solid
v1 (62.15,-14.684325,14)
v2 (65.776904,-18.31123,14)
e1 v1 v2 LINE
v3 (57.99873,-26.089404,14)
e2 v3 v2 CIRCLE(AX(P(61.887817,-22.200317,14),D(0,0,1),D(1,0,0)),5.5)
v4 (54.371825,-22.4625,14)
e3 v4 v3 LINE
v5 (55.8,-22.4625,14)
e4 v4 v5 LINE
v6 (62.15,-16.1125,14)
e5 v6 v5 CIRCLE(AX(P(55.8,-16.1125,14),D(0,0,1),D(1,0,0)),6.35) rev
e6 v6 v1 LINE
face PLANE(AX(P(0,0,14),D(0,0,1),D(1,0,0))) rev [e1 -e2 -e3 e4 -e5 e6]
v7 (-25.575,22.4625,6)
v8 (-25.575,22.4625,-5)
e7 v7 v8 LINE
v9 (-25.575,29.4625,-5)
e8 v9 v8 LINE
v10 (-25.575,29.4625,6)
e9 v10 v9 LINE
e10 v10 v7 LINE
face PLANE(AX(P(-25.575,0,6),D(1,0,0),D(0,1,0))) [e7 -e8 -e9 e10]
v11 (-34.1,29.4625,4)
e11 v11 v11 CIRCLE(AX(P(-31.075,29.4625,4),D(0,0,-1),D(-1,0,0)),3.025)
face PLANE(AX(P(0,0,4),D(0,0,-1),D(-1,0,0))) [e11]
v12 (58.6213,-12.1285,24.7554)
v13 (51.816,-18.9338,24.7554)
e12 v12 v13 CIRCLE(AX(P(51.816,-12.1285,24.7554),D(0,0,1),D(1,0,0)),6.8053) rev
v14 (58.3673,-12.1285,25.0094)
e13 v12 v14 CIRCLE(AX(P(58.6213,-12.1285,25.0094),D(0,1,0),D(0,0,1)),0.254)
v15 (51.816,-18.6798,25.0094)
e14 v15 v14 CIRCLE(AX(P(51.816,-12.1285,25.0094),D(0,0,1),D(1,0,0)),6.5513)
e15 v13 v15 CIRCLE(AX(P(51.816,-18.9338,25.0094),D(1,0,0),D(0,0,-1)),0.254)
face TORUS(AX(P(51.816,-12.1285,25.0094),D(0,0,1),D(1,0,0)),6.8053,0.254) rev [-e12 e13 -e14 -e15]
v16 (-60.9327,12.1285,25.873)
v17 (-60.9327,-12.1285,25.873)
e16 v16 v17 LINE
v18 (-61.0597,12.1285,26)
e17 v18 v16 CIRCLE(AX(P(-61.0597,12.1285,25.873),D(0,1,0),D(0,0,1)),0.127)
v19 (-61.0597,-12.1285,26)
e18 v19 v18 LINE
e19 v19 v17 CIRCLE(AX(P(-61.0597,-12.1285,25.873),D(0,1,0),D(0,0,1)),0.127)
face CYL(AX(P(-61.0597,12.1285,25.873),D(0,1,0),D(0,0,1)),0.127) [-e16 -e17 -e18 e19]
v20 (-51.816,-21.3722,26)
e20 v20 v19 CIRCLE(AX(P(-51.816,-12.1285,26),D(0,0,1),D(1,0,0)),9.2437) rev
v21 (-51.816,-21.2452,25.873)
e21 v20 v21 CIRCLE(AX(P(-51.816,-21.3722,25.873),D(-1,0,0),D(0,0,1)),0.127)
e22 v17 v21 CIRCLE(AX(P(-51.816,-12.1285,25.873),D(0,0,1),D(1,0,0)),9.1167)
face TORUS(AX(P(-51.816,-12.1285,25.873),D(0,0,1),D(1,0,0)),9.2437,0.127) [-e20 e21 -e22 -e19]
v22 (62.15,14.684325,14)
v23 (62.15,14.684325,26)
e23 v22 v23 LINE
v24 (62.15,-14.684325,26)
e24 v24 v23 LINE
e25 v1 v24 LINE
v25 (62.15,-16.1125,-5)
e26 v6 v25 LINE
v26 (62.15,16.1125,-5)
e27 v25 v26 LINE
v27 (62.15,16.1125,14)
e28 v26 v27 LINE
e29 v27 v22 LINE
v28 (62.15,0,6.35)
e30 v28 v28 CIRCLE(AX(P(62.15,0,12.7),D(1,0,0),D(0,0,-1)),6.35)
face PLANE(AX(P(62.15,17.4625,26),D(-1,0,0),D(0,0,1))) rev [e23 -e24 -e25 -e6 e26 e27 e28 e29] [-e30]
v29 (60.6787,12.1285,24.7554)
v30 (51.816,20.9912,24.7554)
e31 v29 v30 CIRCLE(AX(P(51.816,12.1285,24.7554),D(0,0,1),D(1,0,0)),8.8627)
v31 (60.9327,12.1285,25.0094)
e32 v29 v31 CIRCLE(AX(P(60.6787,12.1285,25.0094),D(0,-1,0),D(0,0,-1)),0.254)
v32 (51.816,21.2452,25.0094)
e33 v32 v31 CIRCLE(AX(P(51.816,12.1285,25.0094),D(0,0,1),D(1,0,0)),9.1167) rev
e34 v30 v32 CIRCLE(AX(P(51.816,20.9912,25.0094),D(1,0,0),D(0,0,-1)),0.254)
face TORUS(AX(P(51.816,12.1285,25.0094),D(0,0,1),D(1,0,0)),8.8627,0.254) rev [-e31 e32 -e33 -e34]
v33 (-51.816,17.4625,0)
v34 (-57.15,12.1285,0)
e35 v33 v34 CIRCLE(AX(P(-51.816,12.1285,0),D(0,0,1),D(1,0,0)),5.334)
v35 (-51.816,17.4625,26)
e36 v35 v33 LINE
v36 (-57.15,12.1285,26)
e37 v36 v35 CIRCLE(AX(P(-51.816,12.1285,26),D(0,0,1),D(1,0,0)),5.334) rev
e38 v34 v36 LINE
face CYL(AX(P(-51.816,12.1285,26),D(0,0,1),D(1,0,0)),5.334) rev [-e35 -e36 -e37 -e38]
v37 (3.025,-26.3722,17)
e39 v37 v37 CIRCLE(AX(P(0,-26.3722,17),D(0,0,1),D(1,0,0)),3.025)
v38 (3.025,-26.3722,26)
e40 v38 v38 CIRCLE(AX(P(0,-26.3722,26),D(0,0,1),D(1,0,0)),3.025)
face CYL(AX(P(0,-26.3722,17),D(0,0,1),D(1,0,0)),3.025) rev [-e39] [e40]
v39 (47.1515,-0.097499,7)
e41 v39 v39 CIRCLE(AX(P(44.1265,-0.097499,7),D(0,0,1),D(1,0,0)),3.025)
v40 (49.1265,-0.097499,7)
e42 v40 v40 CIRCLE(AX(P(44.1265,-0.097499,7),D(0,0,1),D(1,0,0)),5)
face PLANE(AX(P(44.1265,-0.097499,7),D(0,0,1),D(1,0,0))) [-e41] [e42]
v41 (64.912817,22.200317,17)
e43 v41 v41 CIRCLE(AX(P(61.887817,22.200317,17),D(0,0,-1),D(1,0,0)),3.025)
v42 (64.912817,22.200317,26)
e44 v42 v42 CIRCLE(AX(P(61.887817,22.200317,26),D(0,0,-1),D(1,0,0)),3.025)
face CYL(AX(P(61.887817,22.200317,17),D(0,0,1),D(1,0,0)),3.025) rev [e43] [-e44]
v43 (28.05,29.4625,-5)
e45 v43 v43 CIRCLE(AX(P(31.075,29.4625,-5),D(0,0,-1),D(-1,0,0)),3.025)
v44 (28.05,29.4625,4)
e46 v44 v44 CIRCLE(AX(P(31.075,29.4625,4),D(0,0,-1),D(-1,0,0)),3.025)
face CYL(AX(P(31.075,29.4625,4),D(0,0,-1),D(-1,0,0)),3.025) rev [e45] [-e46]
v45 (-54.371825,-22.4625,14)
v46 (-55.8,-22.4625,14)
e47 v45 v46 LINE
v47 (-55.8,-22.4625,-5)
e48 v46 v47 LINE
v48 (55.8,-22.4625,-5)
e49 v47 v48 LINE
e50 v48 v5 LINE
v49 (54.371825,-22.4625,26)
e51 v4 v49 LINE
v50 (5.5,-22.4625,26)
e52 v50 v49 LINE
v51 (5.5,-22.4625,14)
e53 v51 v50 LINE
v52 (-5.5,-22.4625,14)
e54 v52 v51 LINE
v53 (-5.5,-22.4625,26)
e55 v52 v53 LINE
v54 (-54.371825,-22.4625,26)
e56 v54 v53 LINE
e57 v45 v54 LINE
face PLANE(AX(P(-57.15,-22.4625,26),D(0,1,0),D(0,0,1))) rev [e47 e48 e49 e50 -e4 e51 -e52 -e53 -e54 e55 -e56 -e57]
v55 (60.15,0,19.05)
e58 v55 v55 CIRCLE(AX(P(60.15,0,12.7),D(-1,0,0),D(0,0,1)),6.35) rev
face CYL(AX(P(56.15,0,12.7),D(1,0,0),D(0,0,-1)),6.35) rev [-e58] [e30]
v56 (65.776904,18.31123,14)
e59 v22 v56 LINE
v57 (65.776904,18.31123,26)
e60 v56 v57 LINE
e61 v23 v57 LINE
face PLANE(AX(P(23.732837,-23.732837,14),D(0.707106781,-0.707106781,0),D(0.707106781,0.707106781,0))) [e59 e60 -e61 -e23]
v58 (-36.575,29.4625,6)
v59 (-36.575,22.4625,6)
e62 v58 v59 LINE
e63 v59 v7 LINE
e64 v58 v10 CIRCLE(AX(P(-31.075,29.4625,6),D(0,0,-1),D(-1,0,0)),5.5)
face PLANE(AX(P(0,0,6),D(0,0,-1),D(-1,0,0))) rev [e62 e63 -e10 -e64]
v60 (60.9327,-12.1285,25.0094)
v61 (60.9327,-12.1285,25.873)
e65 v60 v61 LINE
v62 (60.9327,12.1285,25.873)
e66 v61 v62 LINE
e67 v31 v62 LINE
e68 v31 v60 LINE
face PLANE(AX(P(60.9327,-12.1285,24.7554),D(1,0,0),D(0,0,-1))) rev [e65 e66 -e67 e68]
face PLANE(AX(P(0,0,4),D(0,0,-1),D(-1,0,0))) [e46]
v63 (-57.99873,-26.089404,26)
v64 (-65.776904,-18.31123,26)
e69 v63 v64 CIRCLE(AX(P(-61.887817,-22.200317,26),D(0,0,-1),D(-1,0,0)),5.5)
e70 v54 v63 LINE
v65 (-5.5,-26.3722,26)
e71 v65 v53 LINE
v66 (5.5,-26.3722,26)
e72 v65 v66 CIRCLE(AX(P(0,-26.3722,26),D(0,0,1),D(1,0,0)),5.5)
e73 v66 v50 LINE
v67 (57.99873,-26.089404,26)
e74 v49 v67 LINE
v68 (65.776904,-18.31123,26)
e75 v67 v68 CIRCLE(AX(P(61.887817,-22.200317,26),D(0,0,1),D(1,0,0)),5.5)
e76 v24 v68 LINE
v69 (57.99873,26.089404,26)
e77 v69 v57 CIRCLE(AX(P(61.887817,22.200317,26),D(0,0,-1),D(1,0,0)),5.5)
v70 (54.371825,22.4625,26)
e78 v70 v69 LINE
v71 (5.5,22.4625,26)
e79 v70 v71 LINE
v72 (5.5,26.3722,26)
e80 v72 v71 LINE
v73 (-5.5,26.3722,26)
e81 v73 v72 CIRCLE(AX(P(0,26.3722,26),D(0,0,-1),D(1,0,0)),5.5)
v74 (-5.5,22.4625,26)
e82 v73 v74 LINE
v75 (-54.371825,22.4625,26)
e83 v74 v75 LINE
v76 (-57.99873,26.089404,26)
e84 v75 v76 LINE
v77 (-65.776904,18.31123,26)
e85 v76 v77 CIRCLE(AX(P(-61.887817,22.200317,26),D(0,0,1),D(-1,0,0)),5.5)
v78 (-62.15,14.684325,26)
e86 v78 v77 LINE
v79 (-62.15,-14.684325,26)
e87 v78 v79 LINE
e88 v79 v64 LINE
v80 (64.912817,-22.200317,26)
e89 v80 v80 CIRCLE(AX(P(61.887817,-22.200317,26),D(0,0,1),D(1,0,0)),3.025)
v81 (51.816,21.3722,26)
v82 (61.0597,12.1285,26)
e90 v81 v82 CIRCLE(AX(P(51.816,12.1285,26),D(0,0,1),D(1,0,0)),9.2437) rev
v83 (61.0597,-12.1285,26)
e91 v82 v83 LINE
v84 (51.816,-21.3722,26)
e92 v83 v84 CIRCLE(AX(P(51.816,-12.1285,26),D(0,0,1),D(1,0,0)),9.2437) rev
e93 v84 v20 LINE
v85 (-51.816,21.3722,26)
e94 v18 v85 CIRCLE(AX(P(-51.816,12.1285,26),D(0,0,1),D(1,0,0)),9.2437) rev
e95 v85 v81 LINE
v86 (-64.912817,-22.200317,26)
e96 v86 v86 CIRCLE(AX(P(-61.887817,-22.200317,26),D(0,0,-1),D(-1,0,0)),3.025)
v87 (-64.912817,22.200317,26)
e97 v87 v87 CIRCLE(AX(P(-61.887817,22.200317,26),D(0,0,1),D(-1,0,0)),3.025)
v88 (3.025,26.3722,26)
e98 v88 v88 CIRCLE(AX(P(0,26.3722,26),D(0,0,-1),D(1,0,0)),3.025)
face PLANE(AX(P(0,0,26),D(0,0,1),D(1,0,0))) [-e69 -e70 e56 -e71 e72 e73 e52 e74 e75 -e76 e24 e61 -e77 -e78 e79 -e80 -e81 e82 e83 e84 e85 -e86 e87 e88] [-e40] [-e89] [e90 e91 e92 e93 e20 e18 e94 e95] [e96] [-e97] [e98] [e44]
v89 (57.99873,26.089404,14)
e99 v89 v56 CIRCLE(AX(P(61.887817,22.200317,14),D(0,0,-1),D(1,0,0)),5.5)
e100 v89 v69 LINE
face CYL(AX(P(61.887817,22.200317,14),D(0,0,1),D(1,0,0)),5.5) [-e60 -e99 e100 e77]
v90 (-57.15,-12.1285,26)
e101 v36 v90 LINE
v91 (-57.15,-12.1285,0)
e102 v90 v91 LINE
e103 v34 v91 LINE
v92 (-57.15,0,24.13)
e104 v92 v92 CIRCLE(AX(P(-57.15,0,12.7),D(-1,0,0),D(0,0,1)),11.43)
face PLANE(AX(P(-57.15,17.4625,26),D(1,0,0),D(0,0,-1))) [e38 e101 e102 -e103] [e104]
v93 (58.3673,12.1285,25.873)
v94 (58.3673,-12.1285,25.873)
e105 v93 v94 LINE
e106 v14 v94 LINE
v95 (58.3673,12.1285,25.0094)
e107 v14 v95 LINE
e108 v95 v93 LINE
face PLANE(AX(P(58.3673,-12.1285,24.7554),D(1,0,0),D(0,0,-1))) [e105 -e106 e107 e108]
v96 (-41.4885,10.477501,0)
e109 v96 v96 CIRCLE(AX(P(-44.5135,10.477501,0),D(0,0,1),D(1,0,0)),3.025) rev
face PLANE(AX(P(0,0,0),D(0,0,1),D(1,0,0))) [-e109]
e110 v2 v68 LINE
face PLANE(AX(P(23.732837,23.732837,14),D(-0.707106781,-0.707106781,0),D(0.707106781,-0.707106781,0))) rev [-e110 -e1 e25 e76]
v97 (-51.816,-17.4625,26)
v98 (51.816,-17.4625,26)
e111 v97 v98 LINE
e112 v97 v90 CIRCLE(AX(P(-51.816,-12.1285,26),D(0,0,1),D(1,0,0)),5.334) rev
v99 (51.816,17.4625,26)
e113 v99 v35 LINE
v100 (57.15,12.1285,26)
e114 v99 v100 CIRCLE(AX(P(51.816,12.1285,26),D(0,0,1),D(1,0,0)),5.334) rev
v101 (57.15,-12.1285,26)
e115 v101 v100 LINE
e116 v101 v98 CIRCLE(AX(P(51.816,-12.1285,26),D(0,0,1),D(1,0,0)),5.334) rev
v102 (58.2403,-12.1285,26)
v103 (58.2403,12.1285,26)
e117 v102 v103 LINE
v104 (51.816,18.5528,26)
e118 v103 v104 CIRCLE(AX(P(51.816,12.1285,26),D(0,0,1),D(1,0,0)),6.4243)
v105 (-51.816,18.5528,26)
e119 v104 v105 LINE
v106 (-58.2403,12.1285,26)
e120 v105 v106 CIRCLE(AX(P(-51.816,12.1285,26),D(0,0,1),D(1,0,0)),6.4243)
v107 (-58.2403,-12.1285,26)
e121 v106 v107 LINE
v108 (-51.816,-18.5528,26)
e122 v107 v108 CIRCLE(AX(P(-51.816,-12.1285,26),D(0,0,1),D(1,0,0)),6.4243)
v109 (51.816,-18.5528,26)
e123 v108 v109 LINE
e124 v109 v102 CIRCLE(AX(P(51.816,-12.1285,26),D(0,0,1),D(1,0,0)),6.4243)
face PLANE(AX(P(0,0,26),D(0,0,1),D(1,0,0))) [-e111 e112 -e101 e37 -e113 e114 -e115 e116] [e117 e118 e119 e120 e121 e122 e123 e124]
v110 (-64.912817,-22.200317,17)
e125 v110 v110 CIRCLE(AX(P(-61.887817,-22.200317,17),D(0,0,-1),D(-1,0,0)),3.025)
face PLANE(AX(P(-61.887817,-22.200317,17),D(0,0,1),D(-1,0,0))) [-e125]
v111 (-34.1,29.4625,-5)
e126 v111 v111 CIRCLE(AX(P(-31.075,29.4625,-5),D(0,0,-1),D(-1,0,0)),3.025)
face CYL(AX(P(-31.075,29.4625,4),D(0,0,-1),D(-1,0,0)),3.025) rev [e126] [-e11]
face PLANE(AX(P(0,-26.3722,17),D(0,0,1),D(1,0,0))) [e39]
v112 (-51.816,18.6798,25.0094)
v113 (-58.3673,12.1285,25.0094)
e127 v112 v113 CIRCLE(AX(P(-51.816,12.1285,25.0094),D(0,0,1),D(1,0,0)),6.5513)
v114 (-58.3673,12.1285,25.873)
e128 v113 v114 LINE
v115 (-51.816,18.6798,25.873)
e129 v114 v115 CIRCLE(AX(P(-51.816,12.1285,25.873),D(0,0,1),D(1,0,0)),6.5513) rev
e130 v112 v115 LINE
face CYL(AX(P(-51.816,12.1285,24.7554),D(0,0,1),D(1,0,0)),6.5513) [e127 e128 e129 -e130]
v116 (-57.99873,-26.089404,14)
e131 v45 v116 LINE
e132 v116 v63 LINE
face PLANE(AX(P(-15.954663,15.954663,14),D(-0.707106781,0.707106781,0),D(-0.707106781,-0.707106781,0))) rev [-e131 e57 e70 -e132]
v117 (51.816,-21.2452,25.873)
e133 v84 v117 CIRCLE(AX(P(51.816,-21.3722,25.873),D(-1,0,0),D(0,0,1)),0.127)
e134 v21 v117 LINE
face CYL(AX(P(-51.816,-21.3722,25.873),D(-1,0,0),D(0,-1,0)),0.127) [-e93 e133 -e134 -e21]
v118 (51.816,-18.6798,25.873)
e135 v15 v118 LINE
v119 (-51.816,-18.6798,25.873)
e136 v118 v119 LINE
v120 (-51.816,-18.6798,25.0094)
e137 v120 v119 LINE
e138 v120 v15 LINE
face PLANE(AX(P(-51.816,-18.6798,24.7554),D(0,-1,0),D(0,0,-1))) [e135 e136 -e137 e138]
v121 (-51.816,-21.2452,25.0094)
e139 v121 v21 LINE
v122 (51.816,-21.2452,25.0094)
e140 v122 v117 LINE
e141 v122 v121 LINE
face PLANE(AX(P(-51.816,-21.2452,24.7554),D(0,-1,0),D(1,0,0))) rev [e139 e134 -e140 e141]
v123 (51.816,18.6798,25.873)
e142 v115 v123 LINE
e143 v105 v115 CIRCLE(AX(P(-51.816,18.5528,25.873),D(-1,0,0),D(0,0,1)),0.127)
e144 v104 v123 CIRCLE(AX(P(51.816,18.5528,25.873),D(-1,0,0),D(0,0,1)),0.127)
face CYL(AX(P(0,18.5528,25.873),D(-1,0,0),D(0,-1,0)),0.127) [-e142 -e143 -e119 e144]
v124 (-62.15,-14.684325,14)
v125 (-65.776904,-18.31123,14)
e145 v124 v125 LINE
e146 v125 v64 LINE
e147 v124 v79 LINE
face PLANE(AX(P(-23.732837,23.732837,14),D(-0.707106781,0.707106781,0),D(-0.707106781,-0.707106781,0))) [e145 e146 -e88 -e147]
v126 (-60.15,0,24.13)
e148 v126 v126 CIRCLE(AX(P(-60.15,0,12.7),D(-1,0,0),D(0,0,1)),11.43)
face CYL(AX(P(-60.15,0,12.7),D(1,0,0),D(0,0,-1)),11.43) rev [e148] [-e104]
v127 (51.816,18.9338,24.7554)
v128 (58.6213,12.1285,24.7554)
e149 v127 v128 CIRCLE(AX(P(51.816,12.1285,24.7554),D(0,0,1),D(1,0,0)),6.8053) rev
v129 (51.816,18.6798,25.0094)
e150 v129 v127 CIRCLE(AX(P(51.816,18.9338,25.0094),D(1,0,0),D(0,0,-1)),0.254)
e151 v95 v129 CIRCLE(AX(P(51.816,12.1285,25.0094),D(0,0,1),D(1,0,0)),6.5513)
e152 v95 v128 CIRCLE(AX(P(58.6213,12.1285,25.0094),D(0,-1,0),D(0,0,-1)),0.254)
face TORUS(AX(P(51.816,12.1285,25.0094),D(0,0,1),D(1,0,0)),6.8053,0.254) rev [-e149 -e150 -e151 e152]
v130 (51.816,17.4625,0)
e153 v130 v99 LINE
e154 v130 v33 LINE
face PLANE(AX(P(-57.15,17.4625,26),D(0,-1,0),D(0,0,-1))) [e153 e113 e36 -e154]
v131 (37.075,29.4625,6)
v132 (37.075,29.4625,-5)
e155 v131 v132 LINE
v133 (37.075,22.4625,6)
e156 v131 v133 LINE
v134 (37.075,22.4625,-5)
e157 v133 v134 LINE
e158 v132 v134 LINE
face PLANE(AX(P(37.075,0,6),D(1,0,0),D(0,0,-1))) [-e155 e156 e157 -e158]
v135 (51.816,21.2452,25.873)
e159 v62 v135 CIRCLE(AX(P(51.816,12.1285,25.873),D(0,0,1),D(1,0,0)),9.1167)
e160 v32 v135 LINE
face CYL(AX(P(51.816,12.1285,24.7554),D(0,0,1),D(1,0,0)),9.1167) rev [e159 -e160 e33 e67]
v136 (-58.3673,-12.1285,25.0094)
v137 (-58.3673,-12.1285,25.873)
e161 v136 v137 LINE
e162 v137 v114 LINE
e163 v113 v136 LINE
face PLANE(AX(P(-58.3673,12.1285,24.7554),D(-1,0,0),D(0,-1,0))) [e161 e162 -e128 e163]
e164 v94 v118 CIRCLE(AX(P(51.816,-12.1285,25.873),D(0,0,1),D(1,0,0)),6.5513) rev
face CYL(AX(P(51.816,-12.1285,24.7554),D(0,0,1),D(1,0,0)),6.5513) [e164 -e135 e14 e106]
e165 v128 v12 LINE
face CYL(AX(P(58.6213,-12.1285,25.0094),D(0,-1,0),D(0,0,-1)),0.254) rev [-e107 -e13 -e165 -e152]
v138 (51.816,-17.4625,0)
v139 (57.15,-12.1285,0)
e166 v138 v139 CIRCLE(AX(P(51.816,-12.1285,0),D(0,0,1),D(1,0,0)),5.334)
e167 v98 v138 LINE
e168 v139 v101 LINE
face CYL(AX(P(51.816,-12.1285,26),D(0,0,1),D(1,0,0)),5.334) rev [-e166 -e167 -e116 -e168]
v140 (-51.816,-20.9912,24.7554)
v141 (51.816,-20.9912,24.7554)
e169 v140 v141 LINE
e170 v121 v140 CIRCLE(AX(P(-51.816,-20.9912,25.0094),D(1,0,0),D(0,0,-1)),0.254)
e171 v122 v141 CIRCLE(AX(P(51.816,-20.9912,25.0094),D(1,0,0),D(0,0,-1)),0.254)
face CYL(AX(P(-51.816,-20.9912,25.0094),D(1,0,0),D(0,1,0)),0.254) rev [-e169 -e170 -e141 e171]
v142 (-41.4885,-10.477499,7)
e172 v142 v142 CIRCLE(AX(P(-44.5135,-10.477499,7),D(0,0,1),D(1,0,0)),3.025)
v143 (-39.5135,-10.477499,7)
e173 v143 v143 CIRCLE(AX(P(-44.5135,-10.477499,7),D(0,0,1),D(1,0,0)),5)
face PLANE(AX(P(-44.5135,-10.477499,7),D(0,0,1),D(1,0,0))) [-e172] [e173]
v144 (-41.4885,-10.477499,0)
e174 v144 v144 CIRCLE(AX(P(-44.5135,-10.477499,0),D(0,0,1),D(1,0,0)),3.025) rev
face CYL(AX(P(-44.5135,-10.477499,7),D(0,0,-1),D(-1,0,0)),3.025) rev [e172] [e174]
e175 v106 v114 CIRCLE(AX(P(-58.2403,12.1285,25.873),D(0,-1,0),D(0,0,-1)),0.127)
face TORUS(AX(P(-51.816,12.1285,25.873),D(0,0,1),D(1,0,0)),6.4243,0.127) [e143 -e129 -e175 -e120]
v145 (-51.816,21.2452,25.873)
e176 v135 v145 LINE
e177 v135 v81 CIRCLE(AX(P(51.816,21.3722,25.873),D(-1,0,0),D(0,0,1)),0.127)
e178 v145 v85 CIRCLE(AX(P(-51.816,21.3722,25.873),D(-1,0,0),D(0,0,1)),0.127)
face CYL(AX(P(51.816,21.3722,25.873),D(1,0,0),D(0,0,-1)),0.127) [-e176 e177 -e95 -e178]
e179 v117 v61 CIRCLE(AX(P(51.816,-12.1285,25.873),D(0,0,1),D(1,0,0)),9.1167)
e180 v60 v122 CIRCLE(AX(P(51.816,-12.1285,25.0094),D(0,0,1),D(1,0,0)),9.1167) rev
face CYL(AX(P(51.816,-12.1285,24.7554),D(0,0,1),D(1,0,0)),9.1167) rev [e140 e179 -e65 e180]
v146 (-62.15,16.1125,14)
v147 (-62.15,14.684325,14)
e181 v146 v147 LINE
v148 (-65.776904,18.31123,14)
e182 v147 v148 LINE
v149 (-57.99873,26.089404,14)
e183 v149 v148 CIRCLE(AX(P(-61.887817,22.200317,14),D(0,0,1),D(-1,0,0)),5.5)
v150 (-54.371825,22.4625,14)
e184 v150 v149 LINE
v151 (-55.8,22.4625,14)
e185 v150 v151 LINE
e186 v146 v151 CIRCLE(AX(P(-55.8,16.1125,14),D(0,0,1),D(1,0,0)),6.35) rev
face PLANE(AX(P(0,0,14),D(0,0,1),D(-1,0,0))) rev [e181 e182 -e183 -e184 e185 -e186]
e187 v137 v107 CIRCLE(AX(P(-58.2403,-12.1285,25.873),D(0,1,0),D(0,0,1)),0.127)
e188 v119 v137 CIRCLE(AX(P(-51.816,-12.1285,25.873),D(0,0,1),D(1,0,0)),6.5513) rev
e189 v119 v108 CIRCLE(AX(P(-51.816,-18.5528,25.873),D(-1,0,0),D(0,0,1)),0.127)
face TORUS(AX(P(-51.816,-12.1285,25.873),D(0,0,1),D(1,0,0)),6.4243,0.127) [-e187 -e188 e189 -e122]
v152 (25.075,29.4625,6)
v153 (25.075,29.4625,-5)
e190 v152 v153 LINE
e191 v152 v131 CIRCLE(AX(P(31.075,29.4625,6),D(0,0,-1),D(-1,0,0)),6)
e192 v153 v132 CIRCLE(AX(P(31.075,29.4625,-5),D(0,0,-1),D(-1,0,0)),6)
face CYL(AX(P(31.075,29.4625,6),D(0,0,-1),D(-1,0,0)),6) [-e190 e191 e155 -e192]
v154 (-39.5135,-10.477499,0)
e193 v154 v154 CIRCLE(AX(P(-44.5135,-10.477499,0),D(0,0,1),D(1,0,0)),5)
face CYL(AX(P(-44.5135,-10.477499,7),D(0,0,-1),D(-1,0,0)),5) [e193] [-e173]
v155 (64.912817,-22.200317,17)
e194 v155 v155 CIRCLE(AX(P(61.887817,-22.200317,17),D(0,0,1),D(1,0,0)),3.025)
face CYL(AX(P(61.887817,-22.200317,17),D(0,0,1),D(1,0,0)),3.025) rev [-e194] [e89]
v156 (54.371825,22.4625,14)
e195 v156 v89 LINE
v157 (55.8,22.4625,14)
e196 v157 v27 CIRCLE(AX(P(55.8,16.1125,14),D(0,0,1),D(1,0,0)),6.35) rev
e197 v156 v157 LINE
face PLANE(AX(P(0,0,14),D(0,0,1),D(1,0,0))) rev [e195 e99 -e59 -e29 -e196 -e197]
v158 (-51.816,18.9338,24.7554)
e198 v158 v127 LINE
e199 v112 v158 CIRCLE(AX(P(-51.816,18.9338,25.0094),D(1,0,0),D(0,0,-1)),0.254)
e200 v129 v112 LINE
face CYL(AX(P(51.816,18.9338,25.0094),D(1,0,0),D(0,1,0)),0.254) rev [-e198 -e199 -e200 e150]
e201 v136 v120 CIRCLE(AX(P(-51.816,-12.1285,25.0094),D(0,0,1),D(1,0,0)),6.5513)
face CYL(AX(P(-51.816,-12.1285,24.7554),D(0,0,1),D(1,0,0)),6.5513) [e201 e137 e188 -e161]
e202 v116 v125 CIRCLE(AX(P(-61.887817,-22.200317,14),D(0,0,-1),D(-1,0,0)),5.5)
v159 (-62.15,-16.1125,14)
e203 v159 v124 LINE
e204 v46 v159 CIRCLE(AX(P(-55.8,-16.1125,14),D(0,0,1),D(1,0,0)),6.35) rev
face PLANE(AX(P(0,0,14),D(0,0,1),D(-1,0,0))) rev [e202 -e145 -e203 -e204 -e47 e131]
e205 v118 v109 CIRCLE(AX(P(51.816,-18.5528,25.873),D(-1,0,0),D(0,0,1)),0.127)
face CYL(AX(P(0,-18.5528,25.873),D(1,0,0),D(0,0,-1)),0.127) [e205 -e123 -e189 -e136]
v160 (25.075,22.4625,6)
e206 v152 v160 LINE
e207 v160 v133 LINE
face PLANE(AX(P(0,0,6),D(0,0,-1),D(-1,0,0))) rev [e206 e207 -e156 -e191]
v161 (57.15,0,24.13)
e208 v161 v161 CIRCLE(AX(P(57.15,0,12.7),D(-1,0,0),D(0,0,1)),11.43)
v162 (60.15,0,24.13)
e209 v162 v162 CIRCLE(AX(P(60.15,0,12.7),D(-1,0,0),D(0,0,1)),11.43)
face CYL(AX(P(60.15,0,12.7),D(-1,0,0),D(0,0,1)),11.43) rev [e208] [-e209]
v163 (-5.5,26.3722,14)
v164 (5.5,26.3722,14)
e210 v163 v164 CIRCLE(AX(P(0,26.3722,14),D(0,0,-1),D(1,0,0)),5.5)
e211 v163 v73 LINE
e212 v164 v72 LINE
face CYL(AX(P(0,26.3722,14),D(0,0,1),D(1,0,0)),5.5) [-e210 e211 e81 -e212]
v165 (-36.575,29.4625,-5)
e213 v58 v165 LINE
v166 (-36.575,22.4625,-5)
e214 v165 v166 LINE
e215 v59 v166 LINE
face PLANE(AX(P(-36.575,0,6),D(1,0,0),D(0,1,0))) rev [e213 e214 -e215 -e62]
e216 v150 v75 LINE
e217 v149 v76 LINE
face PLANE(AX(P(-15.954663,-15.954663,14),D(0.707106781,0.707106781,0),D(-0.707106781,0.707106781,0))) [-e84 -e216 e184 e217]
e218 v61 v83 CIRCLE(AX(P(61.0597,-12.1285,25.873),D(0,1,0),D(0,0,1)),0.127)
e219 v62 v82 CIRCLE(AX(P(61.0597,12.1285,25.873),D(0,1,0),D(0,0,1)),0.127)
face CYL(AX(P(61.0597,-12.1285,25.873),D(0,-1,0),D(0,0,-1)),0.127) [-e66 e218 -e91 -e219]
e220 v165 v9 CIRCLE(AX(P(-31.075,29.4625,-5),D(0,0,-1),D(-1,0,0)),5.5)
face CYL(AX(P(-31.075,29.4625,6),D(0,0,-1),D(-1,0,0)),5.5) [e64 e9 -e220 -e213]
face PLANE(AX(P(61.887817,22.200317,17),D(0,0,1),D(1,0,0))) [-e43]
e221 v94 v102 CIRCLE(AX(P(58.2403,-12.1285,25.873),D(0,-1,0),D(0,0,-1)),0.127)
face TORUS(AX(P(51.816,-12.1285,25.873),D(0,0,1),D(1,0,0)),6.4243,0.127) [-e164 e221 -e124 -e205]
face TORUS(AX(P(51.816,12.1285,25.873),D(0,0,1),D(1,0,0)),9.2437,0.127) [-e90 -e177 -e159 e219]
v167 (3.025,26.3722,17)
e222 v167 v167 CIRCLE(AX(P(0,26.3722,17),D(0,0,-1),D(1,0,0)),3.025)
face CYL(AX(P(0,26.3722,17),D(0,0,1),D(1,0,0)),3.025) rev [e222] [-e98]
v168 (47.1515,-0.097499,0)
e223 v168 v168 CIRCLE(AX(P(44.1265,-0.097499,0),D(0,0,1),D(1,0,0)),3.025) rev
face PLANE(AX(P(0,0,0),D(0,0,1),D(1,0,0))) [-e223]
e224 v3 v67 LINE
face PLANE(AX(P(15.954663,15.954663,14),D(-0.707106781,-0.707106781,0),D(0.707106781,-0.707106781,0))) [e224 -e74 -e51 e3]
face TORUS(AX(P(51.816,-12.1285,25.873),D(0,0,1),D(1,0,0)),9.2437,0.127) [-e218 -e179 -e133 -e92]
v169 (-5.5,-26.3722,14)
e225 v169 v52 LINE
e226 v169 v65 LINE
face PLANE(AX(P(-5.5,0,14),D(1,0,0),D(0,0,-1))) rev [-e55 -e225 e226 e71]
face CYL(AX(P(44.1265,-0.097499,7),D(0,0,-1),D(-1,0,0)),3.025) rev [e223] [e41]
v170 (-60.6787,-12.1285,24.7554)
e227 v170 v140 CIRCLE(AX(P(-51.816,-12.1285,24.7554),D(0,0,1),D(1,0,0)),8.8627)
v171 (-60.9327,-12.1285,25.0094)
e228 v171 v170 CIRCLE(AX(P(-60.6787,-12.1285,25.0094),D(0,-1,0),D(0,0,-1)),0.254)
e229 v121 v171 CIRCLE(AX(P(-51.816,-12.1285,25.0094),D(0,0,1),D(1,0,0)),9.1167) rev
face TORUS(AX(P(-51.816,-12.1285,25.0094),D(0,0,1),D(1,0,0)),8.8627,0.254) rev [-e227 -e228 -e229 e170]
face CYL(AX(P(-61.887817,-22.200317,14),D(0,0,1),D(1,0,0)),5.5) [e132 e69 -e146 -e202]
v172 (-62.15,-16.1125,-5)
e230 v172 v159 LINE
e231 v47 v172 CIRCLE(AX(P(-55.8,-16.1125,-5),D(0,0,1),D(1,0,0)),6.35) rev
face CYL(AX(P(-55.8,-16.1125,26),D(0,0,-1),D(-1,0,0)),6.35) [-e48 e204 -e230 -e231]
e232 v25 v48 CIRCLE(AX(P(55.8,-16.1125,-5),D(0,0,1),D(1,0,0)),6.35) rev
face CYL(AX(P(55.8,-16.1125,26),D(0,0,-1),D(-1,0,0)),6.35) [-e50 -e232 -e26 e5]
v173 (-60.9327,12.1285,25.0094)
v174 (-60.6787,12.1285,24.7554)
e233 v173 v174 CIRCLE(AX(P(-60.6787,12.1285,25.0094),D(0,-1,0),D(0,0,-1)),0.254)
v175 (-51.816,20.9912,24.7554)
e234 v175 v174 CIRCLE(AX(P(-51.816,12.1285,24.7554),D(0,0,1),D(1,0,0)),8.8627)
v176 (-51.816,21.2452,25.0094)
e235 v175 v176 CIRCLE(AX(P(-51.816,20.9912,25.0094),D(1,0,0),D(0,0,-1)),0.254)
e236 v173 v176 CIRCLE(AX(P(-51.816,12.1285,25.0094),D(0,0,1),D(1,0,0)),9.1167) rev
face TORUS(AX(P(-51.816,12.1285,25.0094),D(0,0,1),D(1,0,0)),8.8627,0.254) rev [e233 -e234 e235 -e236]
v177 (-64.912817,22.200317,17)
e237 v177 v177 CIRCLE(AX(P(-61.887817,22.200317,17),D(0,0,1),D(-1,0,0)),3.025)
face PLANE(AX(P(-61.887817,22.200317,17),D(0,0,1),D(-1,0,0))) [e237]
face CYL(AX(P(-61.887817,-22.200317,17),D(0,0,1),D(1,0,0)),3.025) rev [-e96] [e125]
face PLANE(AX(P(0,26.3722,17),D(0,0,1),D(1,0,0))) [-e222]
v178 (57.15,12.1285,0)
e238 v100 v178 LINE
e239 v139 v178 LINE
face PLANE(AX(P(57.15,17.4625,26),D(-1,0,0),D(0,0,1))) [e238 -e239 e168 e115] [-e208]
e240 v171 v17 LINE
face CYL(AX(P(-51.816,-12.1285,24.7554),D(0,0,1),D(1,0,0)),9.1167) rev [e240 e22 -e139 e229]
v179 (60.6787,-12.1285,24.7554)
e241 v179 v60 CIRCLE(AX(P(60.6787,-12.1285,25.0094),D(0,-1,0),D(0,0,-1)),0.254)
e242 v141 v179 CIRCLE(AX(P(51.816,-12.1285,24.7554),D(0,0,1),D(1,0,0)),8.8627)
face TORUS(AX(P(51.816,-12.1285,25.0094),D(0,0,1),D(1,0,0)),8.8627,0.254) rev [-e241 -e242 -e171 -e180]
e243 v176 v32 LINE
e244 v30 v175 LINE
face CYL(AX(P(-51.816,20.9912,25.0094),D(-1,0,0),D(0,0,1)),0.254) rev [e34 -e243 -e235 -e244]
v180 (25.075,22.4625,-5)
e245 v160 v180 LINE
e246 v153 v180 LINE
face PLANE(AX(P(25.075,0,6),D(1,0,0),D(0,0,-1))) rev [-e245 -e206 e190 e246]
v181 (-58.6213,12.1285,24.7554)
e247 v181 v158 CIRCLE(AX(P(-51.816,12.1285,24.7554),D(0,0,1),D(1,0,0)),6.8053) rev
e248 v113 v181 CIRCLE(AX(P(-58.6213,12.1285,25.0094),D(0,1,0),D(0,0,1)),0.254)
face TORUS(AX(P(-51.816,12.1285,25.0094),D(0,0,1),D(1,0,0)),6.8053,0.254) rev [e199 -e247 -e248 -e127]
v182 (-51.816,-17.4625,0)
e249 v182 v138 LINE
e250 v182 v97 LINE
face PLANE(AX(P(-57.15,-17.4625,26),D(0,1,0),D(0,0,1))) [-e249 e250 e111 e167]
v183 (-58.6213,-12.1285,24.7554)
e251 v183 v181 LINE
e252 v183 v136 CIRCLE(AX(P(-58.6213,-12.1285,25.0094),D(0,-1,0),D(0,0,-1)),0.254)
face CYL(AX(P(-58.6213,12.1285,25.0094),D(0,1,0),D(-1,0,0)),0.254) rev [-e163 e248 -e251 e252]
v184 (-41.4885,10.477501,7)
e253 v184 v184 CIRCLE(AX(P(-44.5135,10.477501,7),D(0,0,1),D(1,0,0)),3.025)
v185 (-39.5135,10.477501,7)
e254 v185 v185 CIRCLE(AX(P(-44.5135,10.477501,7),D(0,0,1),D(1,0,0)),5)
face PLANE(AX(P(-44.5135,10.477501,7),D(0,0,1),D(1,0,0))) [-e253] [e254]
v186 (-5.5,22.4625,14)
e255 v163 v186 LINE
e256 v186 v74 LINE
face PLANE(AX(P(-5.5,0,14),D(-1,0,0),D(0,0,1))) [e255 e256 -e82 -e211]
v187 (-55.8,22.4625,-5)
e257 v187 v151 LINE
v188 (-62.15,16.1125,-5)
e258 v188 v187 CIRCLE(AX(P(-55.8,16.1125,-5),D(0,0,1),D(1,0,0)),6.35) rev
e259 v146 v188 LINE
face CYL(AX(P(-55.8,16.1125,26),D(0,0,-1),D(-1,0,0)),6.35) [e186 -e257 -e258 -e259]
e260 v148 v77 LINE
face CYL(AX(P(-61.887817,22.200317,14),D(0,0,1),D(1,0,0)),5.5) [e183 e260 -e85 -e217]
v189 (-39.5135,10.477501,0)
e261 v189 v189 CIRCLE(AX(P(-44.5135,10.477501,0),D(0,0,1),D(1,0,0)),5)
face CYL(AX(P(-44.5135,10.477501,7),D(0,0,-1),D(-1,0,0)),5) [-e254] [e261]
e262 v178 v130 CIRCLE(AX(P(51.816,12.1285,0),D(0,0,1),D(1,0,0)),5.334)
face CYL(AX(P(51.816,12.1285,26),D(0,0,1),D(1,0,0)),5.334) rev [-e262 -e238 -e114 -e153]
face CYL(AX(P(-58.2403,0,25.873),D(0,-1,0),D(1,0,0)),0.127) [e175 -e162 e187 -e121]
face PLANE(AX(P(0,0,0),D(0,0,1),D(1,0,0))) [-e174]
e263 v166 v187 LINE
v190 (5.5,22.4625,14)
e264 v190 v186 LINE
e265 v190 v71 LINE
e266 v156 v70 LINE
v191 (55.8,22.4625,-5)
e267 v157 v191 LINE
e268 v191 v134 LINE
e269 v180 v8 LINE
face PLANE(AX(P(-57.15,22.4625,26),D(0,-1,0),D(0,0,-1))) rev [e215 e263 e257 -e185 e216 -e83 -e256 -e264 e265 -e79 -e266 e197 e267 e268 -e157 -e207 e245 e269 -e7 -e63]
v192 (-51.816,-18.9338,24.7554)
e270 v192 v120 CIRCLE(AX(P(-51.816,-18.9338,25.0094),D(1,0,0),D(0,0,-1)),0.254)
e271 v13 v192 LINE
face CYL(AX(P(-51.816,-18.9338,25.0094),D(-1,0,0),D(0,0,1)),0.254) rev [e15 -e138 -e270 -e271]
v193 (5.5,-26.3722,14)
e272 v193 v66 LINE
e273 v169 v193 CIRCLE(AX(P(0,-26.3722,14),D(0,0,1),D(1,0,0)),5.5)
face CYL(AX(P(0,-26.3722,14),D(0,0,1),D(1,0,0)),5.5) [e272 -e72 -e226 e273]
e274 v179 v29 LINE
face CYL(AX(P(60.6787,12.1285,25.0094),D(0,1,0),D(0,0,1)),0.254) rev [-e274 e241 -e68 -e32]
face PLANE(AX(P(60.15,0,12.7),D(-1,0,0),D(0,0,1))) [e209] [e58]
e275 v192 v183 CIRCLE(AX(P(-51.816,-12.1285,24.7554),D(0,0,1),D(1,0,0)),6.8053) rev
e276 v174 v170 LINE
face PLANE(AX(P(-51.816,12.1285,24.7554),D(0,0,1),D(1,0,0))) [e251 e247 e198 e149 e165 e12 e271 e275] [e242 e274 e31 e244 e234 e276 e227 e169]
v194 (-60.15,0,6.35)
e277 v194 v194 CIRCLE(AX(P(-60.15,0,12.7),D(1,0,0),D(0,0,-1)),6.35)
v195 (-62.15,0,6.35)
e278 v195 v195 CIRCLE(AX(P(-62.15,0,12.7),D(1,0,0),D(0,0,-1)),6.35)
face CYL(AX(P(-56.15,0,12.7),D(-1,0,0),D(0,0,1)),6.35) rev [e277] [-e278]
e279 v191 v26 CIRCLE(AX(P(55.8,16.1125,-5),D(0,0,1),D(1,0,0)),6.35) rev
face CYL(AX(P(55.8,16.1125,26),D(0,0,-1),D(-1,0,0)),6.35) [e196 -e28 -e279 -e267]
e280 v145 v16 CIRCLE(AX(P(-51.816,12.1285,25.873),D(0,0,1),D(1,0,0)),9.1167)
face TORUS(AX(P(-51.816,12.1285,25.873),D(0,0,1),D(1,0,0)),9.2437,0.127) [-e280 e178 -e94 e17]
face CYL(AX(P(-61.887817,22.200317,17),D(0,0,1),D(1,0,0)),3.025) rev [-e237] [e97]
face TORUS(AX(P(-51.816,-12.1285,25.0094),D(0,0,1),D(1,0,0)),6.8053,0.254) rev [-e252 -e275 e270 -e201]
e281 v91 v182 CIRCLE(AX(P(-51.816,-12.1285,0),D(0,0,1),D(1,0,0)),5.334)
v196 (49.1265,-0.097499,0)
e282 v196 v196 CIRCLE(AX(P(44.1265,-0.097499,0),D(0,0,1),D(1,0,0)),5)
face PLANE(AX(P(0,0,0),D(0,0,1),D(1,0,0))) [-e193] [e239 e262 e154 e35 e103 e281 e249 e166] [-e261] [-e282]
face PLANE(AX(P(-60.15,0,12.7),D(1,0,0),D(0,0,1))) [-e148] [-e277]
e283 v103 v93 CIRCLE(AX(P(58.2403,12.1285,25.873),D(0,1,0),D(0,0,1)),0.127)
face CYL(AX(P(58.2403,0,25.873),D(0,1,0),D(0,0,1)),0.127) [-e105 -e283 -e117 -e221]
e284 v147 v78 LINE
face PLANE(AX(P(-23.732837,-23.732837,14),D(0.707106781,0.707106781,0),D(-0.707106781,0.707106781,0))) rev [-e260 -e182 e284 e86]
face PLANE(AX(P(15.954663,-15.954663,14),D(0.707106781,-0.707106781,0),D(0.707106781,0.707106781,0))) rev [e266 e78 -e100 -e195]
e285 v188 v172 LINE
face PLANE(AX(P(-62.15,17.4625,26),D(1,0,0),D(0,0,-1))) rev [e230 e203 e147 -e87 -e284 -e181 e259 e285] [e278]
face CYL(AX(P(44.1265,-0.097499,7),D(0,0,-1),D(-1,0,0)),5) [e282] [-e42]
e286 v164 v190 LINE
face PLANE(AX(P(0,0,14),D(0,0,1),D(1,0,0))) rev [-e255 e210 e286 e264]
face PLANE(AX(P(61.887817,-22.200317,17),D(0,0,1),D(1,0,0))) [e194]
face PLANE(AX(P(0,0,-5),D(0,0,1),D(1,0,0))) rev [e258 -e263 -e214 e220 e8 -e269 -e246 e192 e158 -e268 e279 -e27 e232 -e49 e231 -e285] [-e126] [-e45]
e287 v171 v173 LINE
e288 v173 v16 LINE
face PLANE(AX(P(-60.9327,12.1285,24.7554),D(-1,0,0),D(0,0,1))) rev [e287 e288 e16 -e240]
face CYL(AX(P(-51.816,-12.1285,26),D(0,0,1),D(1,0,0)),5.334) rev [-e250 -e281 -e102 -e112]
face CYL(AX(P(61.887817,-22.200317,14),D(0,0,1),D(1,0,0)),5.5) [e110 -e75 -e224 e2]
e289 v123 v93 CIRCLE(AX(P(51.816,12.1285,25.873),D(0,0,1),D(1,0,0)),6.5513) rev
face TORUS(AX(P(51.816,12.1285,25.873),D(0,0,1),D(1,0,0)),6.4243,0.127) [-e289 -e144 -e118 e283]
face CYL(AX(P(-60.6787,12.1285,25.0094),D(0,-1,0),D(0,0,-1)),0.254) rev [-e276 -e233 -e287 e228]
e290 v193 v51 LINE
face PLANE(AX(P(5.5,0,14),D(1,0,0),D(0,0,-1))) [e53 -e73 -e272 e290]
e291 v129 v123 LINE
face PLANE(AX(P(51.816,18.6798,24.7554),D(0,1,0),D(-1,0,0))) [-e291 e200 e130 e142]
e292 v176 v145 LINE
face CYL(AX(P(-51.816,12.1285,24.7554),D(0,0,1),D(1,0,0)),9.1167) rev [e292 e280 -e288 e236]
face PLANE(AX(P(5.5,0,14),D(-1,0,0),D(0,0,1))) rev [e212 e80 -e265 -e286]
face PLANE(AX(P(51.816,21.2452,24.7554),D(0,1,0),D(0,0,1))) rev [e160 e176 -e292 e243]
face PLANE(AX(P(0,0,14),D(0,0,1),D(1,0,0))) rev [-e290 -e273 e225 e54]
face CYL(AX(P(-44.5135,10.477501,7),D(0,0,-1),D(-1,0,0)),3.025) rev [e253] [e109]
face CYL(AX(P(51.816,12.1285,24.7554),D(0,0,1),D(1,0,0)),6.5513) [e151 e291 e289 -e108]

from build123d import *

# Parameters (mm, degrees)
SKETCH1_W               = 114.3
SKETCH1_H               = 34.925
BOSS_EXTRUDE1_DEPTH     = 26
SHELL1_T                = 5
FILLET1_R               = 5.334
FILLET2_R               = 6.35
CUT_EXTRUDE1_DEPTH      = 1.2446
FILLET3_R               = 0.254
FILLET4_R               = 0.127
BOSS_EXTRUDE3_START     = -12
BOSS_EXTRUDE3_DEPTH     = 12
SKETCH5_R               = 3.025
CUT_EXTRUDE3_DEPTH      = 9
MIRROR2_START           = -12
MIRROR2_COPY_1_DEPTH    = 12
MIRROR2_COPY_2_SKETCH_R = 3.025
MIRROR2_COPY_2_DEPTH    = 9
BOSS_EXTRUDE4_DEPTH     = 12
SKETCH7_R               = 3.025
CUT_EXTRUDE4_DEPTH      = 9
CUT_EXTRUDE5_DEPTH      = 6
SKETCH10_R              = 5
SKETCH10_R_2            = 3.025
BOSS_EXTRUDE5_DEPTH     = 7
SKETCH11_R              = 11.43
CUT_EXTRUDE6_DEPTH      = 3
SKETCH12_R              = 6
SKETCH12_R_2            = 3.025
SKETCH12_R_3            = 5.5
BOSS_EXTRUDE6_DEPTH     = 11
SKETCH13_R              = 3.025
CUT_EXTRUDE7_DEPTH      = 9


with BuildPart() as part:
    # Sketch1 → Boss-Extrude1 (new body)
    with BuildSketch(Plane.XY):
        Rectangle(SKETCH1_W, SKETCH1_H)
    extrude(amount=BOSS_EXTRUDE1_DEPTH)

    # Shell1
    shell1_openings = [part.faces().sort_by_distance(p)[0] for p in [
        (0, 0, 26),
    ]]
    offset(amount=SHELL1_T, openings=shell1_openings, kind=Kind.INTERSECTION)

    # Fillet1
    # the kernel refuses this fillet: 5.334 mm, written as the material it adds along each edge
    with BuildSketch(Plane(origin=(57.15, -17.4625, 0), x_dir=(0, 1, 0), z_dir=(0, 0, 1)), Plane(origin=(57.15, 17.4625, 0), x_dir=(-1, 0, 0), z_dir=(0, 0, 1)), Plane(origin=(-57.15, -17.4625, 0), x_dir=(1, 0, 0), z_dir=(0, 0, 1))) as fillet1_piece_1:
        with BuildLine():
            CenterArc((FILLET1_R, FILLET1_R), FILLET1_R, 180, 90)
            Line((0, FILLET1_R), (0, 0))
            Line((0, 0), (FILLET1_R, 0))
        make_face()
    extrude(amount=26)
    with BuildSketch(Plane(origin=(-57.15, 17.4625, 0), x_dir=(1, 0, 0), z_dir=(0, 0, 1))) as fillet1_piece_2:
        with BuildLine():
            CenterArc((FILLET1_R, -FILLET1_R), FILLET1_R, 90, 90)
            Line((0, -FILLET1_R), (0, 0))
            Line((0, 0), (FILLET1_R, 0))
        make_face()
    extrude(amount=26)

    # Fillet2
    fillet2_edges = [part.edges().sort_by_distance(p)[0] for p in [
        (62.15, -22.4625, 10.5),
        (-62.15, -22.4625, 10.5),
        (-62.15, 22.4625, 10.5),
        (62.15, 22.4625, 10.5),
    ]]
    fillet(fillet2_edges, radius=FILLET2_R)

    # Sketch2 → Cut-Extrude1 (cut)
    with BuildSketch(Plane.XY.offset(26)):
        with BuildLine():
            Line((-60.9327, 12.1285), (-60.9327, -12.1285))
            ThreePointArc((-60.9327, -12.1285), (-58.262480392, -18.574980392), (-51.816, -21.2452))
            Line((-51.816, -21.2452), (51.816, -21.2452))
            ThreePointArc((51.816, -21.2452), (58.262480392, -18.574980392), (60.9327, -12.1285))
            Line((60.9327, -12.1285), (60.9327, 12.1285))
            ThreePointArc((60.9327, 12.1285), (58.262480392, 18.574980392), (51.816, 21.2452))
            Line((51.816, 21.2452), (-51.816, 21.2452))
            ThreePointArc((-51.816, 21.2452), (-58.262480392, 18.574980392), (-60.9327, 12.1285))
        make_face()
        with BuildLine():
            Line((51.816, 18.6798), (-51.816, 18.6798))
            ThreePointArc((-51.816, 18.6798), (-56.448468656, 16.760968656), (-58.3673, 12.1285))
            Line((-58.3673, 12.1285), (-58.3673, -12.1285))
            ThreePointArc((-58.3673, -12.1285), (-56.448468656, -16.760968656), (-51.816, -18.6798))
            Line((-51.816, -18.6798), (51.816, -18.6798))
            ThreePointArc((51.816, -18.6798), (56.448468656, -16.760968656), (58.3673, -12.1285))
            Line((58.3673, -12.1285), (58.3673, 12.1285))
            ThreePointArc((58.3673, 12.1285), (56.448468656, 16.760968656), (51.816, 18.6798))
        make_face(mode=Mode.SUBTRACT)
    extrude(amount=-CUT_EXTRUDE1_DEPTH, mode=Mode.SUBTRACT)

    # Fillet3
    fillet3_edges = [part.edges().sort_by_distance(p)[0] for p in [
        (-58.262480392, 18.574980392, 24.7554),
        (0, 21.2452, 24.7554),
        (58.262480392, 18.574980392, 24.7554),
        (60.9327, 0, 24.7554),
        (58.262480392, -18.574980392, 24.7554),
        (0, -21.2452, 24.7554),
        (-58.262480392, -18.574980392, 24.7554),
        (-60.9327, 0, 24.7554),
        (58.3673, 0, 24.7554),
        (56.448468656, 16.760968656, 24.7554),
        (0, 18.6798, 24.7554),
        (-56.448468656, 16.760968656, 24.7554),
        (-58.3673, 0, 24.7554),
        (-56.448468656, -16.760968656, 24.7554),
        (0, -18.6798, 24.7554),
        (56.448468656, -16.760968656, 24.7554),
    ]]
    fillet(fillet3_edges, radius=FILLET3_R)

    # Fillet4
    fillet4_edges = [part.edges().sort_by_distance(p)[0] for p in [
        (-58.262480392, 18.574980392, 26),
        (-60.9327, 0, 26),
        (-58.262480392, -18.574980392, 26),
        (0, -21.2452, 26),
        (58.262480392, -18.574980392, 26),
        (60.9327, 0, 26),
        (58.262480392, 18.574980392, 26),
        (0, 21.2452, 26),
        (56.448468656, 16.760968656, 26),
        (58.3673, 0, 26),
        (56.448468656, -16.760968656, 26),
        (0, -18.6798, 26),
        (-56.448468656, -16.760968656, 26),
        (-58.3673, 0, 26),
        (-56.448468656, 16.760968656, 26),
        (0, 18.6798, 26),
    ]]
    fillet(fillet4_edges, radius=FILLET4_R)

    # Sketch4 → Boss-Extrude3 (add)
    with BuildSketch(Plane.XY.offset(26).offset(BOSS_EXTRUDE3_START)):
        with BuildLine():
            ThreePointArc((62.15, -16.1125), (61.666635031, -18.542539796), (60.290128061, -20.602628061))
            ThreePointArc((60.290128061, -20.602628061), (58.230039796, -21.979135031), (55.8, -22.4625))
            Line((55.8, -22.4625), (54.371825407, -22.4625))
            Line((54.371825407, -22.4625), (57.998729563, -26.089404156))
            ThreePointArc((57.998729563, -26.089404156), (65.776904156, -26.089404156), (65.776904156, -18.311229563))
            Line((65.776904156, -18.311229563), (62.15, -14.684325407))
            Line((62.15, -14.684325407), (62.15, -16.1125))
        make_face()
    boss_extrude3 = extrude(amount=BOSS_EXTRUDE3_DEPTH)

    # Sketch5 → Cut-Extrude3 (cut)
    with BuildSketch(Plane.XY.offset(26)):
        with Locations((61.887816859, -22.200316859)):
            Circle(SKETCH5_R)
    cut_extrude3 = extrude(amount=-CUT_EXTRUDE3_DEPTH, mode=Mode.SUBTRACT)

    # Mirror1: Boss-Extrude3, Cut-Extrude3 across plane
    add(boss_extrude3.mirror(Plane.ZX))
    add(cut_extrude3.mirror(Plane.ZX), mode=Mode.SUBTRACT)

    # Mirror2: Boss-Extrude3, Cut-Extrude3 across plane
    add(boss_extrude3.mirror(Plane(origin=(0, 0, 0), x_dir=(0, 0, 1), z_dir=(1, 0, 0))))
    add(cut_extrude3.mirror(Plane(origin=(0, 0, 0), x_dir=(0, 0, 1), z_dir=(1, 0, 0))), mode=Mode.SUBTRACT)

    # Mirror2 copy 1 sketch → Mirror2 copy 1 (add)
    with BuildSketch(Plane(origin=(0, 0, 26), x_dir=(-1, 0, 0), z_dir=(0, 0, 1)).offset(MIRROR2_START)):
        with BuildLine():
            ThreePointArc((62.15, -16.1125), (61.666635031, -18.542539796), (60.290128061, -20.602628061))
            ThreePointArc((60.290128061, -20.602628061), (58.230039796, -21.979135031), (55.8, -22.4625))
            Line((55.8, -22.4625), (54.371825407, -22.4625))
            Line((54.371825407, -22.4625), (57.998729563, -26.089404156))
            ThreePointArc((57.998729563, -26.089404156), (65.776904156, -26.089404156), (65.776904156, -18.311229563))
            Line((65.776904156, -18.311229563), (62.15, -14.684325407))
            Line((62.15, -14.684325407), (62.15, -16.1125))
        make_face()
    extrude(amount=MIRROR2_COPY_1_DEPTH)

    # Mirror2 copy 2 sketch → Mirror2 copy 2 (cut)
    with BuildSketch(Plane(origin=(0, 0, 26), x_dir=(-1, 0, 0), z_dir=(0, 0, 1))):
        with Locations((61.887816859, -22.200316859)):
            Circle(MIRROR2_COPY_2_SKETCH_R)
    extrude(amount=-MIRROR2_COPY_2_DEPTH, mode=Mode.SUBTRACT)

    # Sketch6 → Boss-Extrude4 (add)
    with BuildSketch(Plane.XY.offset(26)):
        with BuildLine():
            Line((0, -22.4625), (-5.5, -22.4625))
            Line((-5.5, -22.4625), (-5.5, -26.3722))
            ThreePointArc((-5.5, -26.3722), (0, -31.8722), (5.5, -26.3722))
            Line((5.5, -26.3722), (5.5, -22.4625))
            Line((5.5, -22.4625), (0, -22.4625))
        make_face()
    boss_extrude4 = extrude(amount=-BOSS_EXTRUDE4_DEPTH)

    # Sketch7 → Cut-Extrude4 (cut)
    with BuildSketch(Plane.XY.offset(26)):
        with Locations((0, -26.3722)):
            Circle(SKETCH7_R)
    cut_extrude4 = extrude(amount=-CUT_EXTRUDE4_DEPTH, mode=Mode.SUBTRACT)

    # Mirror3: Boss-Extrude4, Cut-Extrude4 across plane
    add(boss_extrude4.mirror(Plane.ZX))
    add(cut_extrude4.mirror(Plane.ZX), mode=Mode.SUBTRACT)

    # Sketch9 → Cut-Extrude5 (cut)
    with BuildSketch(Plane(origin=(62.15, 0, 0), x_dir=(0, 0, -1), z_dir=(1, 0, 0))):
        with BuildLine():
            ThreePointArc((-19.05, 0), (-12.7, -6.35), (-6.35, 0))
            Line((-6.35, 0), (-19.05, 0))
        make_face()
        with BuildLine():
            Line((-19.05, 0), (-6.35, 0))
            ThreePointArc((-6.35, 0), (-12.7, 6.35), (-19.05, 0))
        make_face()
    cut_extrude5 = extrude(amount=-CUT_EXTRUDE5_DEPTH, mode=Mode.SUBTRACT)

    # Sketch10 → Boss-Extrude5 (add)
    # profile 1 of 3: a face of its own
    with BuildSketch(Plane.XY):
        with Locations((-44.513500214, 10.477500595)):
            Circle(SKETCH10_R)
        with Locations((-44.513500214, 10.477500595)):
            Circle(SKETCH10_R_2, mode=Mode.SUBTRACT)
    # profile 2 of 3: a face of its own
    with BuildSketch(Plane.XY):
        with Locations((-44.513500214, -10.477499405)):
            Circle(SKETCH10_R)
        with Locations((-44.513500214, -10.477499405)):
            Circle(SKETCH10_R_2, mode=Mode.SUBTRACT)
    # profile 3 of 3: a face of its own
    with BuildSketch(Plane.XY):
        with Locations((44.126499786, -0.097499405)):
            Circle(SKETCH10_R)
        with Locations((44.126499786, -0.097499405)):
            Circle(SKETCH10_R_2, mode=Mode.SUBTRACT)
    extrude(amount=BOSS_EXTRUDE5_DEPTH)

    # Sketch11 → Cut-Extrude6 (cut)
    with BuildSketch(Plane.ZY.offset(-57.15)):
        with Locations((12.7, 0)):
            Circle(SKETCH11_R)
    cut_extrude6 = extrude(amount=-CUT_EXTRUDE6_DEPTH, mode=Mode.SUBTRACT)

    # Mirror4: Cut-Extrude5, Cut-Extrude6 across plane
    add(cut_extrude5.mirror(Plane(origin=(0, 0, 0), x_dir=(0, 0, 1), z_dir=(1, 0, 0))), mode=Mode.SUBTRACT)
    add(cut_extrude6.mirror(Plane(origin=(0, 0, 0), x_dir=(0, 0, 1), z_dir=(1, 0, 0))), mode=Mode.SUBTRACT)

    # Sketch12 → Boss-Extrude6 (add)
    # profile 1 of 6: a face of its own
    with BuildSketch(Plane(origin=(0, 0, -5), x_dir=(-1, 0, 0), z_dir=(0, 0, -1))):
        with BuildLine():
            Line((-37.075, 29.4625), (-37.075, 22.4625))
            Line((-37.075, 22.4625), (-31.075, 22.4625))
            Line((-31.075, 22.4625), (-25.075, 22.4625))
            Line((-25.075, 22.4625), (-25.075, 29.4625))
            ThreePointArc((-25.075, 29.4625), (-31.075, 23.4625), (-37.075, 29.4625))
        make_face()
    # profile 2 of 6: a face of its own
    with BuildSketch(Plane(origin=(0, 0, -5), x_dir=(-1, 0, 0), z_dir=(0, 0, -1))):
        with Locations((-31.075, 29.4625)):
            Circle(SKETCH12_R)
        with Locations((-31.075, 29.4625)):
            Circle(SKETCH12_R_2, mode=Mode.SUBTRACT)
    # profile 3 of 6: a face of its own
    with BuildSketch(Plane(origin=(0, 0, -5), x_dir=(-1, 0, 0), z_dir=(0, 0, -1))):
        with Locations((-31.075, 29.4625)):
            Circle(SKETCH12_R_2)
    # profile 4 of 6: a face of its own
    with BuildSketch(Plane(origin=(0, 0, -5), x_dir=(-1, 0, 0), z_dir=(0, 0, -1))):
        with BuildLine():
            Line((25.575, 29.4625), (25.575, 22.4625))
            Line((25.575, 22.4625), (36.575, 22.4625))
            Line((36.575, 22.4625), (36.575, 29.4625))
            ThreePointArc((36.575, 29.4625), (31.075, 23.9625), (25.575, 29.4625))
        make_face()
    # profile 5 of 6: a face of its own
    with BuildSketch(Plane(origin=(0, 0, -5), x_dir=(-1, 0, 0), z_dir=(0, 0, -1))):
        with Locations((31.075, 29.4625)):
            Circle(SKETCH12_R_3)
        with Locations((31.075, 29.4625)):
            Circle(SKETCH12_R_2, mode=Mode.SUBTRACT)
    # profile 6 of 6: a face of its own
    with BuildSketch(Plane(origin=(0, 0, -5), x_dir=(-1, 0, 0), z_dir=(0, 0, -1))):
        with Locations((31.075, 29.4625)):
            Circle(SKETCH12_R_2)
    extrude(amount=-BOSS_EXTRUDE6_DEPTH)

    # Sketch13 → Cut-Extrude7 (cut)
    with BuildSketch(Plane(origin=(0, 0, -5), x_dir=(-1, 0, 0), z_dir=(0, 0, -1))):
        with Locations((-31.075, 29.4625)):
            Circle(SKETCH13_R)
        with Locations((31.075, 29.4625)):
            Circle(SKETCH13_R)
    extrude(amount=-CUT_EXTRUDE7_DEPTH, mode=Mode.SUBTRACT)


solid = part.part
